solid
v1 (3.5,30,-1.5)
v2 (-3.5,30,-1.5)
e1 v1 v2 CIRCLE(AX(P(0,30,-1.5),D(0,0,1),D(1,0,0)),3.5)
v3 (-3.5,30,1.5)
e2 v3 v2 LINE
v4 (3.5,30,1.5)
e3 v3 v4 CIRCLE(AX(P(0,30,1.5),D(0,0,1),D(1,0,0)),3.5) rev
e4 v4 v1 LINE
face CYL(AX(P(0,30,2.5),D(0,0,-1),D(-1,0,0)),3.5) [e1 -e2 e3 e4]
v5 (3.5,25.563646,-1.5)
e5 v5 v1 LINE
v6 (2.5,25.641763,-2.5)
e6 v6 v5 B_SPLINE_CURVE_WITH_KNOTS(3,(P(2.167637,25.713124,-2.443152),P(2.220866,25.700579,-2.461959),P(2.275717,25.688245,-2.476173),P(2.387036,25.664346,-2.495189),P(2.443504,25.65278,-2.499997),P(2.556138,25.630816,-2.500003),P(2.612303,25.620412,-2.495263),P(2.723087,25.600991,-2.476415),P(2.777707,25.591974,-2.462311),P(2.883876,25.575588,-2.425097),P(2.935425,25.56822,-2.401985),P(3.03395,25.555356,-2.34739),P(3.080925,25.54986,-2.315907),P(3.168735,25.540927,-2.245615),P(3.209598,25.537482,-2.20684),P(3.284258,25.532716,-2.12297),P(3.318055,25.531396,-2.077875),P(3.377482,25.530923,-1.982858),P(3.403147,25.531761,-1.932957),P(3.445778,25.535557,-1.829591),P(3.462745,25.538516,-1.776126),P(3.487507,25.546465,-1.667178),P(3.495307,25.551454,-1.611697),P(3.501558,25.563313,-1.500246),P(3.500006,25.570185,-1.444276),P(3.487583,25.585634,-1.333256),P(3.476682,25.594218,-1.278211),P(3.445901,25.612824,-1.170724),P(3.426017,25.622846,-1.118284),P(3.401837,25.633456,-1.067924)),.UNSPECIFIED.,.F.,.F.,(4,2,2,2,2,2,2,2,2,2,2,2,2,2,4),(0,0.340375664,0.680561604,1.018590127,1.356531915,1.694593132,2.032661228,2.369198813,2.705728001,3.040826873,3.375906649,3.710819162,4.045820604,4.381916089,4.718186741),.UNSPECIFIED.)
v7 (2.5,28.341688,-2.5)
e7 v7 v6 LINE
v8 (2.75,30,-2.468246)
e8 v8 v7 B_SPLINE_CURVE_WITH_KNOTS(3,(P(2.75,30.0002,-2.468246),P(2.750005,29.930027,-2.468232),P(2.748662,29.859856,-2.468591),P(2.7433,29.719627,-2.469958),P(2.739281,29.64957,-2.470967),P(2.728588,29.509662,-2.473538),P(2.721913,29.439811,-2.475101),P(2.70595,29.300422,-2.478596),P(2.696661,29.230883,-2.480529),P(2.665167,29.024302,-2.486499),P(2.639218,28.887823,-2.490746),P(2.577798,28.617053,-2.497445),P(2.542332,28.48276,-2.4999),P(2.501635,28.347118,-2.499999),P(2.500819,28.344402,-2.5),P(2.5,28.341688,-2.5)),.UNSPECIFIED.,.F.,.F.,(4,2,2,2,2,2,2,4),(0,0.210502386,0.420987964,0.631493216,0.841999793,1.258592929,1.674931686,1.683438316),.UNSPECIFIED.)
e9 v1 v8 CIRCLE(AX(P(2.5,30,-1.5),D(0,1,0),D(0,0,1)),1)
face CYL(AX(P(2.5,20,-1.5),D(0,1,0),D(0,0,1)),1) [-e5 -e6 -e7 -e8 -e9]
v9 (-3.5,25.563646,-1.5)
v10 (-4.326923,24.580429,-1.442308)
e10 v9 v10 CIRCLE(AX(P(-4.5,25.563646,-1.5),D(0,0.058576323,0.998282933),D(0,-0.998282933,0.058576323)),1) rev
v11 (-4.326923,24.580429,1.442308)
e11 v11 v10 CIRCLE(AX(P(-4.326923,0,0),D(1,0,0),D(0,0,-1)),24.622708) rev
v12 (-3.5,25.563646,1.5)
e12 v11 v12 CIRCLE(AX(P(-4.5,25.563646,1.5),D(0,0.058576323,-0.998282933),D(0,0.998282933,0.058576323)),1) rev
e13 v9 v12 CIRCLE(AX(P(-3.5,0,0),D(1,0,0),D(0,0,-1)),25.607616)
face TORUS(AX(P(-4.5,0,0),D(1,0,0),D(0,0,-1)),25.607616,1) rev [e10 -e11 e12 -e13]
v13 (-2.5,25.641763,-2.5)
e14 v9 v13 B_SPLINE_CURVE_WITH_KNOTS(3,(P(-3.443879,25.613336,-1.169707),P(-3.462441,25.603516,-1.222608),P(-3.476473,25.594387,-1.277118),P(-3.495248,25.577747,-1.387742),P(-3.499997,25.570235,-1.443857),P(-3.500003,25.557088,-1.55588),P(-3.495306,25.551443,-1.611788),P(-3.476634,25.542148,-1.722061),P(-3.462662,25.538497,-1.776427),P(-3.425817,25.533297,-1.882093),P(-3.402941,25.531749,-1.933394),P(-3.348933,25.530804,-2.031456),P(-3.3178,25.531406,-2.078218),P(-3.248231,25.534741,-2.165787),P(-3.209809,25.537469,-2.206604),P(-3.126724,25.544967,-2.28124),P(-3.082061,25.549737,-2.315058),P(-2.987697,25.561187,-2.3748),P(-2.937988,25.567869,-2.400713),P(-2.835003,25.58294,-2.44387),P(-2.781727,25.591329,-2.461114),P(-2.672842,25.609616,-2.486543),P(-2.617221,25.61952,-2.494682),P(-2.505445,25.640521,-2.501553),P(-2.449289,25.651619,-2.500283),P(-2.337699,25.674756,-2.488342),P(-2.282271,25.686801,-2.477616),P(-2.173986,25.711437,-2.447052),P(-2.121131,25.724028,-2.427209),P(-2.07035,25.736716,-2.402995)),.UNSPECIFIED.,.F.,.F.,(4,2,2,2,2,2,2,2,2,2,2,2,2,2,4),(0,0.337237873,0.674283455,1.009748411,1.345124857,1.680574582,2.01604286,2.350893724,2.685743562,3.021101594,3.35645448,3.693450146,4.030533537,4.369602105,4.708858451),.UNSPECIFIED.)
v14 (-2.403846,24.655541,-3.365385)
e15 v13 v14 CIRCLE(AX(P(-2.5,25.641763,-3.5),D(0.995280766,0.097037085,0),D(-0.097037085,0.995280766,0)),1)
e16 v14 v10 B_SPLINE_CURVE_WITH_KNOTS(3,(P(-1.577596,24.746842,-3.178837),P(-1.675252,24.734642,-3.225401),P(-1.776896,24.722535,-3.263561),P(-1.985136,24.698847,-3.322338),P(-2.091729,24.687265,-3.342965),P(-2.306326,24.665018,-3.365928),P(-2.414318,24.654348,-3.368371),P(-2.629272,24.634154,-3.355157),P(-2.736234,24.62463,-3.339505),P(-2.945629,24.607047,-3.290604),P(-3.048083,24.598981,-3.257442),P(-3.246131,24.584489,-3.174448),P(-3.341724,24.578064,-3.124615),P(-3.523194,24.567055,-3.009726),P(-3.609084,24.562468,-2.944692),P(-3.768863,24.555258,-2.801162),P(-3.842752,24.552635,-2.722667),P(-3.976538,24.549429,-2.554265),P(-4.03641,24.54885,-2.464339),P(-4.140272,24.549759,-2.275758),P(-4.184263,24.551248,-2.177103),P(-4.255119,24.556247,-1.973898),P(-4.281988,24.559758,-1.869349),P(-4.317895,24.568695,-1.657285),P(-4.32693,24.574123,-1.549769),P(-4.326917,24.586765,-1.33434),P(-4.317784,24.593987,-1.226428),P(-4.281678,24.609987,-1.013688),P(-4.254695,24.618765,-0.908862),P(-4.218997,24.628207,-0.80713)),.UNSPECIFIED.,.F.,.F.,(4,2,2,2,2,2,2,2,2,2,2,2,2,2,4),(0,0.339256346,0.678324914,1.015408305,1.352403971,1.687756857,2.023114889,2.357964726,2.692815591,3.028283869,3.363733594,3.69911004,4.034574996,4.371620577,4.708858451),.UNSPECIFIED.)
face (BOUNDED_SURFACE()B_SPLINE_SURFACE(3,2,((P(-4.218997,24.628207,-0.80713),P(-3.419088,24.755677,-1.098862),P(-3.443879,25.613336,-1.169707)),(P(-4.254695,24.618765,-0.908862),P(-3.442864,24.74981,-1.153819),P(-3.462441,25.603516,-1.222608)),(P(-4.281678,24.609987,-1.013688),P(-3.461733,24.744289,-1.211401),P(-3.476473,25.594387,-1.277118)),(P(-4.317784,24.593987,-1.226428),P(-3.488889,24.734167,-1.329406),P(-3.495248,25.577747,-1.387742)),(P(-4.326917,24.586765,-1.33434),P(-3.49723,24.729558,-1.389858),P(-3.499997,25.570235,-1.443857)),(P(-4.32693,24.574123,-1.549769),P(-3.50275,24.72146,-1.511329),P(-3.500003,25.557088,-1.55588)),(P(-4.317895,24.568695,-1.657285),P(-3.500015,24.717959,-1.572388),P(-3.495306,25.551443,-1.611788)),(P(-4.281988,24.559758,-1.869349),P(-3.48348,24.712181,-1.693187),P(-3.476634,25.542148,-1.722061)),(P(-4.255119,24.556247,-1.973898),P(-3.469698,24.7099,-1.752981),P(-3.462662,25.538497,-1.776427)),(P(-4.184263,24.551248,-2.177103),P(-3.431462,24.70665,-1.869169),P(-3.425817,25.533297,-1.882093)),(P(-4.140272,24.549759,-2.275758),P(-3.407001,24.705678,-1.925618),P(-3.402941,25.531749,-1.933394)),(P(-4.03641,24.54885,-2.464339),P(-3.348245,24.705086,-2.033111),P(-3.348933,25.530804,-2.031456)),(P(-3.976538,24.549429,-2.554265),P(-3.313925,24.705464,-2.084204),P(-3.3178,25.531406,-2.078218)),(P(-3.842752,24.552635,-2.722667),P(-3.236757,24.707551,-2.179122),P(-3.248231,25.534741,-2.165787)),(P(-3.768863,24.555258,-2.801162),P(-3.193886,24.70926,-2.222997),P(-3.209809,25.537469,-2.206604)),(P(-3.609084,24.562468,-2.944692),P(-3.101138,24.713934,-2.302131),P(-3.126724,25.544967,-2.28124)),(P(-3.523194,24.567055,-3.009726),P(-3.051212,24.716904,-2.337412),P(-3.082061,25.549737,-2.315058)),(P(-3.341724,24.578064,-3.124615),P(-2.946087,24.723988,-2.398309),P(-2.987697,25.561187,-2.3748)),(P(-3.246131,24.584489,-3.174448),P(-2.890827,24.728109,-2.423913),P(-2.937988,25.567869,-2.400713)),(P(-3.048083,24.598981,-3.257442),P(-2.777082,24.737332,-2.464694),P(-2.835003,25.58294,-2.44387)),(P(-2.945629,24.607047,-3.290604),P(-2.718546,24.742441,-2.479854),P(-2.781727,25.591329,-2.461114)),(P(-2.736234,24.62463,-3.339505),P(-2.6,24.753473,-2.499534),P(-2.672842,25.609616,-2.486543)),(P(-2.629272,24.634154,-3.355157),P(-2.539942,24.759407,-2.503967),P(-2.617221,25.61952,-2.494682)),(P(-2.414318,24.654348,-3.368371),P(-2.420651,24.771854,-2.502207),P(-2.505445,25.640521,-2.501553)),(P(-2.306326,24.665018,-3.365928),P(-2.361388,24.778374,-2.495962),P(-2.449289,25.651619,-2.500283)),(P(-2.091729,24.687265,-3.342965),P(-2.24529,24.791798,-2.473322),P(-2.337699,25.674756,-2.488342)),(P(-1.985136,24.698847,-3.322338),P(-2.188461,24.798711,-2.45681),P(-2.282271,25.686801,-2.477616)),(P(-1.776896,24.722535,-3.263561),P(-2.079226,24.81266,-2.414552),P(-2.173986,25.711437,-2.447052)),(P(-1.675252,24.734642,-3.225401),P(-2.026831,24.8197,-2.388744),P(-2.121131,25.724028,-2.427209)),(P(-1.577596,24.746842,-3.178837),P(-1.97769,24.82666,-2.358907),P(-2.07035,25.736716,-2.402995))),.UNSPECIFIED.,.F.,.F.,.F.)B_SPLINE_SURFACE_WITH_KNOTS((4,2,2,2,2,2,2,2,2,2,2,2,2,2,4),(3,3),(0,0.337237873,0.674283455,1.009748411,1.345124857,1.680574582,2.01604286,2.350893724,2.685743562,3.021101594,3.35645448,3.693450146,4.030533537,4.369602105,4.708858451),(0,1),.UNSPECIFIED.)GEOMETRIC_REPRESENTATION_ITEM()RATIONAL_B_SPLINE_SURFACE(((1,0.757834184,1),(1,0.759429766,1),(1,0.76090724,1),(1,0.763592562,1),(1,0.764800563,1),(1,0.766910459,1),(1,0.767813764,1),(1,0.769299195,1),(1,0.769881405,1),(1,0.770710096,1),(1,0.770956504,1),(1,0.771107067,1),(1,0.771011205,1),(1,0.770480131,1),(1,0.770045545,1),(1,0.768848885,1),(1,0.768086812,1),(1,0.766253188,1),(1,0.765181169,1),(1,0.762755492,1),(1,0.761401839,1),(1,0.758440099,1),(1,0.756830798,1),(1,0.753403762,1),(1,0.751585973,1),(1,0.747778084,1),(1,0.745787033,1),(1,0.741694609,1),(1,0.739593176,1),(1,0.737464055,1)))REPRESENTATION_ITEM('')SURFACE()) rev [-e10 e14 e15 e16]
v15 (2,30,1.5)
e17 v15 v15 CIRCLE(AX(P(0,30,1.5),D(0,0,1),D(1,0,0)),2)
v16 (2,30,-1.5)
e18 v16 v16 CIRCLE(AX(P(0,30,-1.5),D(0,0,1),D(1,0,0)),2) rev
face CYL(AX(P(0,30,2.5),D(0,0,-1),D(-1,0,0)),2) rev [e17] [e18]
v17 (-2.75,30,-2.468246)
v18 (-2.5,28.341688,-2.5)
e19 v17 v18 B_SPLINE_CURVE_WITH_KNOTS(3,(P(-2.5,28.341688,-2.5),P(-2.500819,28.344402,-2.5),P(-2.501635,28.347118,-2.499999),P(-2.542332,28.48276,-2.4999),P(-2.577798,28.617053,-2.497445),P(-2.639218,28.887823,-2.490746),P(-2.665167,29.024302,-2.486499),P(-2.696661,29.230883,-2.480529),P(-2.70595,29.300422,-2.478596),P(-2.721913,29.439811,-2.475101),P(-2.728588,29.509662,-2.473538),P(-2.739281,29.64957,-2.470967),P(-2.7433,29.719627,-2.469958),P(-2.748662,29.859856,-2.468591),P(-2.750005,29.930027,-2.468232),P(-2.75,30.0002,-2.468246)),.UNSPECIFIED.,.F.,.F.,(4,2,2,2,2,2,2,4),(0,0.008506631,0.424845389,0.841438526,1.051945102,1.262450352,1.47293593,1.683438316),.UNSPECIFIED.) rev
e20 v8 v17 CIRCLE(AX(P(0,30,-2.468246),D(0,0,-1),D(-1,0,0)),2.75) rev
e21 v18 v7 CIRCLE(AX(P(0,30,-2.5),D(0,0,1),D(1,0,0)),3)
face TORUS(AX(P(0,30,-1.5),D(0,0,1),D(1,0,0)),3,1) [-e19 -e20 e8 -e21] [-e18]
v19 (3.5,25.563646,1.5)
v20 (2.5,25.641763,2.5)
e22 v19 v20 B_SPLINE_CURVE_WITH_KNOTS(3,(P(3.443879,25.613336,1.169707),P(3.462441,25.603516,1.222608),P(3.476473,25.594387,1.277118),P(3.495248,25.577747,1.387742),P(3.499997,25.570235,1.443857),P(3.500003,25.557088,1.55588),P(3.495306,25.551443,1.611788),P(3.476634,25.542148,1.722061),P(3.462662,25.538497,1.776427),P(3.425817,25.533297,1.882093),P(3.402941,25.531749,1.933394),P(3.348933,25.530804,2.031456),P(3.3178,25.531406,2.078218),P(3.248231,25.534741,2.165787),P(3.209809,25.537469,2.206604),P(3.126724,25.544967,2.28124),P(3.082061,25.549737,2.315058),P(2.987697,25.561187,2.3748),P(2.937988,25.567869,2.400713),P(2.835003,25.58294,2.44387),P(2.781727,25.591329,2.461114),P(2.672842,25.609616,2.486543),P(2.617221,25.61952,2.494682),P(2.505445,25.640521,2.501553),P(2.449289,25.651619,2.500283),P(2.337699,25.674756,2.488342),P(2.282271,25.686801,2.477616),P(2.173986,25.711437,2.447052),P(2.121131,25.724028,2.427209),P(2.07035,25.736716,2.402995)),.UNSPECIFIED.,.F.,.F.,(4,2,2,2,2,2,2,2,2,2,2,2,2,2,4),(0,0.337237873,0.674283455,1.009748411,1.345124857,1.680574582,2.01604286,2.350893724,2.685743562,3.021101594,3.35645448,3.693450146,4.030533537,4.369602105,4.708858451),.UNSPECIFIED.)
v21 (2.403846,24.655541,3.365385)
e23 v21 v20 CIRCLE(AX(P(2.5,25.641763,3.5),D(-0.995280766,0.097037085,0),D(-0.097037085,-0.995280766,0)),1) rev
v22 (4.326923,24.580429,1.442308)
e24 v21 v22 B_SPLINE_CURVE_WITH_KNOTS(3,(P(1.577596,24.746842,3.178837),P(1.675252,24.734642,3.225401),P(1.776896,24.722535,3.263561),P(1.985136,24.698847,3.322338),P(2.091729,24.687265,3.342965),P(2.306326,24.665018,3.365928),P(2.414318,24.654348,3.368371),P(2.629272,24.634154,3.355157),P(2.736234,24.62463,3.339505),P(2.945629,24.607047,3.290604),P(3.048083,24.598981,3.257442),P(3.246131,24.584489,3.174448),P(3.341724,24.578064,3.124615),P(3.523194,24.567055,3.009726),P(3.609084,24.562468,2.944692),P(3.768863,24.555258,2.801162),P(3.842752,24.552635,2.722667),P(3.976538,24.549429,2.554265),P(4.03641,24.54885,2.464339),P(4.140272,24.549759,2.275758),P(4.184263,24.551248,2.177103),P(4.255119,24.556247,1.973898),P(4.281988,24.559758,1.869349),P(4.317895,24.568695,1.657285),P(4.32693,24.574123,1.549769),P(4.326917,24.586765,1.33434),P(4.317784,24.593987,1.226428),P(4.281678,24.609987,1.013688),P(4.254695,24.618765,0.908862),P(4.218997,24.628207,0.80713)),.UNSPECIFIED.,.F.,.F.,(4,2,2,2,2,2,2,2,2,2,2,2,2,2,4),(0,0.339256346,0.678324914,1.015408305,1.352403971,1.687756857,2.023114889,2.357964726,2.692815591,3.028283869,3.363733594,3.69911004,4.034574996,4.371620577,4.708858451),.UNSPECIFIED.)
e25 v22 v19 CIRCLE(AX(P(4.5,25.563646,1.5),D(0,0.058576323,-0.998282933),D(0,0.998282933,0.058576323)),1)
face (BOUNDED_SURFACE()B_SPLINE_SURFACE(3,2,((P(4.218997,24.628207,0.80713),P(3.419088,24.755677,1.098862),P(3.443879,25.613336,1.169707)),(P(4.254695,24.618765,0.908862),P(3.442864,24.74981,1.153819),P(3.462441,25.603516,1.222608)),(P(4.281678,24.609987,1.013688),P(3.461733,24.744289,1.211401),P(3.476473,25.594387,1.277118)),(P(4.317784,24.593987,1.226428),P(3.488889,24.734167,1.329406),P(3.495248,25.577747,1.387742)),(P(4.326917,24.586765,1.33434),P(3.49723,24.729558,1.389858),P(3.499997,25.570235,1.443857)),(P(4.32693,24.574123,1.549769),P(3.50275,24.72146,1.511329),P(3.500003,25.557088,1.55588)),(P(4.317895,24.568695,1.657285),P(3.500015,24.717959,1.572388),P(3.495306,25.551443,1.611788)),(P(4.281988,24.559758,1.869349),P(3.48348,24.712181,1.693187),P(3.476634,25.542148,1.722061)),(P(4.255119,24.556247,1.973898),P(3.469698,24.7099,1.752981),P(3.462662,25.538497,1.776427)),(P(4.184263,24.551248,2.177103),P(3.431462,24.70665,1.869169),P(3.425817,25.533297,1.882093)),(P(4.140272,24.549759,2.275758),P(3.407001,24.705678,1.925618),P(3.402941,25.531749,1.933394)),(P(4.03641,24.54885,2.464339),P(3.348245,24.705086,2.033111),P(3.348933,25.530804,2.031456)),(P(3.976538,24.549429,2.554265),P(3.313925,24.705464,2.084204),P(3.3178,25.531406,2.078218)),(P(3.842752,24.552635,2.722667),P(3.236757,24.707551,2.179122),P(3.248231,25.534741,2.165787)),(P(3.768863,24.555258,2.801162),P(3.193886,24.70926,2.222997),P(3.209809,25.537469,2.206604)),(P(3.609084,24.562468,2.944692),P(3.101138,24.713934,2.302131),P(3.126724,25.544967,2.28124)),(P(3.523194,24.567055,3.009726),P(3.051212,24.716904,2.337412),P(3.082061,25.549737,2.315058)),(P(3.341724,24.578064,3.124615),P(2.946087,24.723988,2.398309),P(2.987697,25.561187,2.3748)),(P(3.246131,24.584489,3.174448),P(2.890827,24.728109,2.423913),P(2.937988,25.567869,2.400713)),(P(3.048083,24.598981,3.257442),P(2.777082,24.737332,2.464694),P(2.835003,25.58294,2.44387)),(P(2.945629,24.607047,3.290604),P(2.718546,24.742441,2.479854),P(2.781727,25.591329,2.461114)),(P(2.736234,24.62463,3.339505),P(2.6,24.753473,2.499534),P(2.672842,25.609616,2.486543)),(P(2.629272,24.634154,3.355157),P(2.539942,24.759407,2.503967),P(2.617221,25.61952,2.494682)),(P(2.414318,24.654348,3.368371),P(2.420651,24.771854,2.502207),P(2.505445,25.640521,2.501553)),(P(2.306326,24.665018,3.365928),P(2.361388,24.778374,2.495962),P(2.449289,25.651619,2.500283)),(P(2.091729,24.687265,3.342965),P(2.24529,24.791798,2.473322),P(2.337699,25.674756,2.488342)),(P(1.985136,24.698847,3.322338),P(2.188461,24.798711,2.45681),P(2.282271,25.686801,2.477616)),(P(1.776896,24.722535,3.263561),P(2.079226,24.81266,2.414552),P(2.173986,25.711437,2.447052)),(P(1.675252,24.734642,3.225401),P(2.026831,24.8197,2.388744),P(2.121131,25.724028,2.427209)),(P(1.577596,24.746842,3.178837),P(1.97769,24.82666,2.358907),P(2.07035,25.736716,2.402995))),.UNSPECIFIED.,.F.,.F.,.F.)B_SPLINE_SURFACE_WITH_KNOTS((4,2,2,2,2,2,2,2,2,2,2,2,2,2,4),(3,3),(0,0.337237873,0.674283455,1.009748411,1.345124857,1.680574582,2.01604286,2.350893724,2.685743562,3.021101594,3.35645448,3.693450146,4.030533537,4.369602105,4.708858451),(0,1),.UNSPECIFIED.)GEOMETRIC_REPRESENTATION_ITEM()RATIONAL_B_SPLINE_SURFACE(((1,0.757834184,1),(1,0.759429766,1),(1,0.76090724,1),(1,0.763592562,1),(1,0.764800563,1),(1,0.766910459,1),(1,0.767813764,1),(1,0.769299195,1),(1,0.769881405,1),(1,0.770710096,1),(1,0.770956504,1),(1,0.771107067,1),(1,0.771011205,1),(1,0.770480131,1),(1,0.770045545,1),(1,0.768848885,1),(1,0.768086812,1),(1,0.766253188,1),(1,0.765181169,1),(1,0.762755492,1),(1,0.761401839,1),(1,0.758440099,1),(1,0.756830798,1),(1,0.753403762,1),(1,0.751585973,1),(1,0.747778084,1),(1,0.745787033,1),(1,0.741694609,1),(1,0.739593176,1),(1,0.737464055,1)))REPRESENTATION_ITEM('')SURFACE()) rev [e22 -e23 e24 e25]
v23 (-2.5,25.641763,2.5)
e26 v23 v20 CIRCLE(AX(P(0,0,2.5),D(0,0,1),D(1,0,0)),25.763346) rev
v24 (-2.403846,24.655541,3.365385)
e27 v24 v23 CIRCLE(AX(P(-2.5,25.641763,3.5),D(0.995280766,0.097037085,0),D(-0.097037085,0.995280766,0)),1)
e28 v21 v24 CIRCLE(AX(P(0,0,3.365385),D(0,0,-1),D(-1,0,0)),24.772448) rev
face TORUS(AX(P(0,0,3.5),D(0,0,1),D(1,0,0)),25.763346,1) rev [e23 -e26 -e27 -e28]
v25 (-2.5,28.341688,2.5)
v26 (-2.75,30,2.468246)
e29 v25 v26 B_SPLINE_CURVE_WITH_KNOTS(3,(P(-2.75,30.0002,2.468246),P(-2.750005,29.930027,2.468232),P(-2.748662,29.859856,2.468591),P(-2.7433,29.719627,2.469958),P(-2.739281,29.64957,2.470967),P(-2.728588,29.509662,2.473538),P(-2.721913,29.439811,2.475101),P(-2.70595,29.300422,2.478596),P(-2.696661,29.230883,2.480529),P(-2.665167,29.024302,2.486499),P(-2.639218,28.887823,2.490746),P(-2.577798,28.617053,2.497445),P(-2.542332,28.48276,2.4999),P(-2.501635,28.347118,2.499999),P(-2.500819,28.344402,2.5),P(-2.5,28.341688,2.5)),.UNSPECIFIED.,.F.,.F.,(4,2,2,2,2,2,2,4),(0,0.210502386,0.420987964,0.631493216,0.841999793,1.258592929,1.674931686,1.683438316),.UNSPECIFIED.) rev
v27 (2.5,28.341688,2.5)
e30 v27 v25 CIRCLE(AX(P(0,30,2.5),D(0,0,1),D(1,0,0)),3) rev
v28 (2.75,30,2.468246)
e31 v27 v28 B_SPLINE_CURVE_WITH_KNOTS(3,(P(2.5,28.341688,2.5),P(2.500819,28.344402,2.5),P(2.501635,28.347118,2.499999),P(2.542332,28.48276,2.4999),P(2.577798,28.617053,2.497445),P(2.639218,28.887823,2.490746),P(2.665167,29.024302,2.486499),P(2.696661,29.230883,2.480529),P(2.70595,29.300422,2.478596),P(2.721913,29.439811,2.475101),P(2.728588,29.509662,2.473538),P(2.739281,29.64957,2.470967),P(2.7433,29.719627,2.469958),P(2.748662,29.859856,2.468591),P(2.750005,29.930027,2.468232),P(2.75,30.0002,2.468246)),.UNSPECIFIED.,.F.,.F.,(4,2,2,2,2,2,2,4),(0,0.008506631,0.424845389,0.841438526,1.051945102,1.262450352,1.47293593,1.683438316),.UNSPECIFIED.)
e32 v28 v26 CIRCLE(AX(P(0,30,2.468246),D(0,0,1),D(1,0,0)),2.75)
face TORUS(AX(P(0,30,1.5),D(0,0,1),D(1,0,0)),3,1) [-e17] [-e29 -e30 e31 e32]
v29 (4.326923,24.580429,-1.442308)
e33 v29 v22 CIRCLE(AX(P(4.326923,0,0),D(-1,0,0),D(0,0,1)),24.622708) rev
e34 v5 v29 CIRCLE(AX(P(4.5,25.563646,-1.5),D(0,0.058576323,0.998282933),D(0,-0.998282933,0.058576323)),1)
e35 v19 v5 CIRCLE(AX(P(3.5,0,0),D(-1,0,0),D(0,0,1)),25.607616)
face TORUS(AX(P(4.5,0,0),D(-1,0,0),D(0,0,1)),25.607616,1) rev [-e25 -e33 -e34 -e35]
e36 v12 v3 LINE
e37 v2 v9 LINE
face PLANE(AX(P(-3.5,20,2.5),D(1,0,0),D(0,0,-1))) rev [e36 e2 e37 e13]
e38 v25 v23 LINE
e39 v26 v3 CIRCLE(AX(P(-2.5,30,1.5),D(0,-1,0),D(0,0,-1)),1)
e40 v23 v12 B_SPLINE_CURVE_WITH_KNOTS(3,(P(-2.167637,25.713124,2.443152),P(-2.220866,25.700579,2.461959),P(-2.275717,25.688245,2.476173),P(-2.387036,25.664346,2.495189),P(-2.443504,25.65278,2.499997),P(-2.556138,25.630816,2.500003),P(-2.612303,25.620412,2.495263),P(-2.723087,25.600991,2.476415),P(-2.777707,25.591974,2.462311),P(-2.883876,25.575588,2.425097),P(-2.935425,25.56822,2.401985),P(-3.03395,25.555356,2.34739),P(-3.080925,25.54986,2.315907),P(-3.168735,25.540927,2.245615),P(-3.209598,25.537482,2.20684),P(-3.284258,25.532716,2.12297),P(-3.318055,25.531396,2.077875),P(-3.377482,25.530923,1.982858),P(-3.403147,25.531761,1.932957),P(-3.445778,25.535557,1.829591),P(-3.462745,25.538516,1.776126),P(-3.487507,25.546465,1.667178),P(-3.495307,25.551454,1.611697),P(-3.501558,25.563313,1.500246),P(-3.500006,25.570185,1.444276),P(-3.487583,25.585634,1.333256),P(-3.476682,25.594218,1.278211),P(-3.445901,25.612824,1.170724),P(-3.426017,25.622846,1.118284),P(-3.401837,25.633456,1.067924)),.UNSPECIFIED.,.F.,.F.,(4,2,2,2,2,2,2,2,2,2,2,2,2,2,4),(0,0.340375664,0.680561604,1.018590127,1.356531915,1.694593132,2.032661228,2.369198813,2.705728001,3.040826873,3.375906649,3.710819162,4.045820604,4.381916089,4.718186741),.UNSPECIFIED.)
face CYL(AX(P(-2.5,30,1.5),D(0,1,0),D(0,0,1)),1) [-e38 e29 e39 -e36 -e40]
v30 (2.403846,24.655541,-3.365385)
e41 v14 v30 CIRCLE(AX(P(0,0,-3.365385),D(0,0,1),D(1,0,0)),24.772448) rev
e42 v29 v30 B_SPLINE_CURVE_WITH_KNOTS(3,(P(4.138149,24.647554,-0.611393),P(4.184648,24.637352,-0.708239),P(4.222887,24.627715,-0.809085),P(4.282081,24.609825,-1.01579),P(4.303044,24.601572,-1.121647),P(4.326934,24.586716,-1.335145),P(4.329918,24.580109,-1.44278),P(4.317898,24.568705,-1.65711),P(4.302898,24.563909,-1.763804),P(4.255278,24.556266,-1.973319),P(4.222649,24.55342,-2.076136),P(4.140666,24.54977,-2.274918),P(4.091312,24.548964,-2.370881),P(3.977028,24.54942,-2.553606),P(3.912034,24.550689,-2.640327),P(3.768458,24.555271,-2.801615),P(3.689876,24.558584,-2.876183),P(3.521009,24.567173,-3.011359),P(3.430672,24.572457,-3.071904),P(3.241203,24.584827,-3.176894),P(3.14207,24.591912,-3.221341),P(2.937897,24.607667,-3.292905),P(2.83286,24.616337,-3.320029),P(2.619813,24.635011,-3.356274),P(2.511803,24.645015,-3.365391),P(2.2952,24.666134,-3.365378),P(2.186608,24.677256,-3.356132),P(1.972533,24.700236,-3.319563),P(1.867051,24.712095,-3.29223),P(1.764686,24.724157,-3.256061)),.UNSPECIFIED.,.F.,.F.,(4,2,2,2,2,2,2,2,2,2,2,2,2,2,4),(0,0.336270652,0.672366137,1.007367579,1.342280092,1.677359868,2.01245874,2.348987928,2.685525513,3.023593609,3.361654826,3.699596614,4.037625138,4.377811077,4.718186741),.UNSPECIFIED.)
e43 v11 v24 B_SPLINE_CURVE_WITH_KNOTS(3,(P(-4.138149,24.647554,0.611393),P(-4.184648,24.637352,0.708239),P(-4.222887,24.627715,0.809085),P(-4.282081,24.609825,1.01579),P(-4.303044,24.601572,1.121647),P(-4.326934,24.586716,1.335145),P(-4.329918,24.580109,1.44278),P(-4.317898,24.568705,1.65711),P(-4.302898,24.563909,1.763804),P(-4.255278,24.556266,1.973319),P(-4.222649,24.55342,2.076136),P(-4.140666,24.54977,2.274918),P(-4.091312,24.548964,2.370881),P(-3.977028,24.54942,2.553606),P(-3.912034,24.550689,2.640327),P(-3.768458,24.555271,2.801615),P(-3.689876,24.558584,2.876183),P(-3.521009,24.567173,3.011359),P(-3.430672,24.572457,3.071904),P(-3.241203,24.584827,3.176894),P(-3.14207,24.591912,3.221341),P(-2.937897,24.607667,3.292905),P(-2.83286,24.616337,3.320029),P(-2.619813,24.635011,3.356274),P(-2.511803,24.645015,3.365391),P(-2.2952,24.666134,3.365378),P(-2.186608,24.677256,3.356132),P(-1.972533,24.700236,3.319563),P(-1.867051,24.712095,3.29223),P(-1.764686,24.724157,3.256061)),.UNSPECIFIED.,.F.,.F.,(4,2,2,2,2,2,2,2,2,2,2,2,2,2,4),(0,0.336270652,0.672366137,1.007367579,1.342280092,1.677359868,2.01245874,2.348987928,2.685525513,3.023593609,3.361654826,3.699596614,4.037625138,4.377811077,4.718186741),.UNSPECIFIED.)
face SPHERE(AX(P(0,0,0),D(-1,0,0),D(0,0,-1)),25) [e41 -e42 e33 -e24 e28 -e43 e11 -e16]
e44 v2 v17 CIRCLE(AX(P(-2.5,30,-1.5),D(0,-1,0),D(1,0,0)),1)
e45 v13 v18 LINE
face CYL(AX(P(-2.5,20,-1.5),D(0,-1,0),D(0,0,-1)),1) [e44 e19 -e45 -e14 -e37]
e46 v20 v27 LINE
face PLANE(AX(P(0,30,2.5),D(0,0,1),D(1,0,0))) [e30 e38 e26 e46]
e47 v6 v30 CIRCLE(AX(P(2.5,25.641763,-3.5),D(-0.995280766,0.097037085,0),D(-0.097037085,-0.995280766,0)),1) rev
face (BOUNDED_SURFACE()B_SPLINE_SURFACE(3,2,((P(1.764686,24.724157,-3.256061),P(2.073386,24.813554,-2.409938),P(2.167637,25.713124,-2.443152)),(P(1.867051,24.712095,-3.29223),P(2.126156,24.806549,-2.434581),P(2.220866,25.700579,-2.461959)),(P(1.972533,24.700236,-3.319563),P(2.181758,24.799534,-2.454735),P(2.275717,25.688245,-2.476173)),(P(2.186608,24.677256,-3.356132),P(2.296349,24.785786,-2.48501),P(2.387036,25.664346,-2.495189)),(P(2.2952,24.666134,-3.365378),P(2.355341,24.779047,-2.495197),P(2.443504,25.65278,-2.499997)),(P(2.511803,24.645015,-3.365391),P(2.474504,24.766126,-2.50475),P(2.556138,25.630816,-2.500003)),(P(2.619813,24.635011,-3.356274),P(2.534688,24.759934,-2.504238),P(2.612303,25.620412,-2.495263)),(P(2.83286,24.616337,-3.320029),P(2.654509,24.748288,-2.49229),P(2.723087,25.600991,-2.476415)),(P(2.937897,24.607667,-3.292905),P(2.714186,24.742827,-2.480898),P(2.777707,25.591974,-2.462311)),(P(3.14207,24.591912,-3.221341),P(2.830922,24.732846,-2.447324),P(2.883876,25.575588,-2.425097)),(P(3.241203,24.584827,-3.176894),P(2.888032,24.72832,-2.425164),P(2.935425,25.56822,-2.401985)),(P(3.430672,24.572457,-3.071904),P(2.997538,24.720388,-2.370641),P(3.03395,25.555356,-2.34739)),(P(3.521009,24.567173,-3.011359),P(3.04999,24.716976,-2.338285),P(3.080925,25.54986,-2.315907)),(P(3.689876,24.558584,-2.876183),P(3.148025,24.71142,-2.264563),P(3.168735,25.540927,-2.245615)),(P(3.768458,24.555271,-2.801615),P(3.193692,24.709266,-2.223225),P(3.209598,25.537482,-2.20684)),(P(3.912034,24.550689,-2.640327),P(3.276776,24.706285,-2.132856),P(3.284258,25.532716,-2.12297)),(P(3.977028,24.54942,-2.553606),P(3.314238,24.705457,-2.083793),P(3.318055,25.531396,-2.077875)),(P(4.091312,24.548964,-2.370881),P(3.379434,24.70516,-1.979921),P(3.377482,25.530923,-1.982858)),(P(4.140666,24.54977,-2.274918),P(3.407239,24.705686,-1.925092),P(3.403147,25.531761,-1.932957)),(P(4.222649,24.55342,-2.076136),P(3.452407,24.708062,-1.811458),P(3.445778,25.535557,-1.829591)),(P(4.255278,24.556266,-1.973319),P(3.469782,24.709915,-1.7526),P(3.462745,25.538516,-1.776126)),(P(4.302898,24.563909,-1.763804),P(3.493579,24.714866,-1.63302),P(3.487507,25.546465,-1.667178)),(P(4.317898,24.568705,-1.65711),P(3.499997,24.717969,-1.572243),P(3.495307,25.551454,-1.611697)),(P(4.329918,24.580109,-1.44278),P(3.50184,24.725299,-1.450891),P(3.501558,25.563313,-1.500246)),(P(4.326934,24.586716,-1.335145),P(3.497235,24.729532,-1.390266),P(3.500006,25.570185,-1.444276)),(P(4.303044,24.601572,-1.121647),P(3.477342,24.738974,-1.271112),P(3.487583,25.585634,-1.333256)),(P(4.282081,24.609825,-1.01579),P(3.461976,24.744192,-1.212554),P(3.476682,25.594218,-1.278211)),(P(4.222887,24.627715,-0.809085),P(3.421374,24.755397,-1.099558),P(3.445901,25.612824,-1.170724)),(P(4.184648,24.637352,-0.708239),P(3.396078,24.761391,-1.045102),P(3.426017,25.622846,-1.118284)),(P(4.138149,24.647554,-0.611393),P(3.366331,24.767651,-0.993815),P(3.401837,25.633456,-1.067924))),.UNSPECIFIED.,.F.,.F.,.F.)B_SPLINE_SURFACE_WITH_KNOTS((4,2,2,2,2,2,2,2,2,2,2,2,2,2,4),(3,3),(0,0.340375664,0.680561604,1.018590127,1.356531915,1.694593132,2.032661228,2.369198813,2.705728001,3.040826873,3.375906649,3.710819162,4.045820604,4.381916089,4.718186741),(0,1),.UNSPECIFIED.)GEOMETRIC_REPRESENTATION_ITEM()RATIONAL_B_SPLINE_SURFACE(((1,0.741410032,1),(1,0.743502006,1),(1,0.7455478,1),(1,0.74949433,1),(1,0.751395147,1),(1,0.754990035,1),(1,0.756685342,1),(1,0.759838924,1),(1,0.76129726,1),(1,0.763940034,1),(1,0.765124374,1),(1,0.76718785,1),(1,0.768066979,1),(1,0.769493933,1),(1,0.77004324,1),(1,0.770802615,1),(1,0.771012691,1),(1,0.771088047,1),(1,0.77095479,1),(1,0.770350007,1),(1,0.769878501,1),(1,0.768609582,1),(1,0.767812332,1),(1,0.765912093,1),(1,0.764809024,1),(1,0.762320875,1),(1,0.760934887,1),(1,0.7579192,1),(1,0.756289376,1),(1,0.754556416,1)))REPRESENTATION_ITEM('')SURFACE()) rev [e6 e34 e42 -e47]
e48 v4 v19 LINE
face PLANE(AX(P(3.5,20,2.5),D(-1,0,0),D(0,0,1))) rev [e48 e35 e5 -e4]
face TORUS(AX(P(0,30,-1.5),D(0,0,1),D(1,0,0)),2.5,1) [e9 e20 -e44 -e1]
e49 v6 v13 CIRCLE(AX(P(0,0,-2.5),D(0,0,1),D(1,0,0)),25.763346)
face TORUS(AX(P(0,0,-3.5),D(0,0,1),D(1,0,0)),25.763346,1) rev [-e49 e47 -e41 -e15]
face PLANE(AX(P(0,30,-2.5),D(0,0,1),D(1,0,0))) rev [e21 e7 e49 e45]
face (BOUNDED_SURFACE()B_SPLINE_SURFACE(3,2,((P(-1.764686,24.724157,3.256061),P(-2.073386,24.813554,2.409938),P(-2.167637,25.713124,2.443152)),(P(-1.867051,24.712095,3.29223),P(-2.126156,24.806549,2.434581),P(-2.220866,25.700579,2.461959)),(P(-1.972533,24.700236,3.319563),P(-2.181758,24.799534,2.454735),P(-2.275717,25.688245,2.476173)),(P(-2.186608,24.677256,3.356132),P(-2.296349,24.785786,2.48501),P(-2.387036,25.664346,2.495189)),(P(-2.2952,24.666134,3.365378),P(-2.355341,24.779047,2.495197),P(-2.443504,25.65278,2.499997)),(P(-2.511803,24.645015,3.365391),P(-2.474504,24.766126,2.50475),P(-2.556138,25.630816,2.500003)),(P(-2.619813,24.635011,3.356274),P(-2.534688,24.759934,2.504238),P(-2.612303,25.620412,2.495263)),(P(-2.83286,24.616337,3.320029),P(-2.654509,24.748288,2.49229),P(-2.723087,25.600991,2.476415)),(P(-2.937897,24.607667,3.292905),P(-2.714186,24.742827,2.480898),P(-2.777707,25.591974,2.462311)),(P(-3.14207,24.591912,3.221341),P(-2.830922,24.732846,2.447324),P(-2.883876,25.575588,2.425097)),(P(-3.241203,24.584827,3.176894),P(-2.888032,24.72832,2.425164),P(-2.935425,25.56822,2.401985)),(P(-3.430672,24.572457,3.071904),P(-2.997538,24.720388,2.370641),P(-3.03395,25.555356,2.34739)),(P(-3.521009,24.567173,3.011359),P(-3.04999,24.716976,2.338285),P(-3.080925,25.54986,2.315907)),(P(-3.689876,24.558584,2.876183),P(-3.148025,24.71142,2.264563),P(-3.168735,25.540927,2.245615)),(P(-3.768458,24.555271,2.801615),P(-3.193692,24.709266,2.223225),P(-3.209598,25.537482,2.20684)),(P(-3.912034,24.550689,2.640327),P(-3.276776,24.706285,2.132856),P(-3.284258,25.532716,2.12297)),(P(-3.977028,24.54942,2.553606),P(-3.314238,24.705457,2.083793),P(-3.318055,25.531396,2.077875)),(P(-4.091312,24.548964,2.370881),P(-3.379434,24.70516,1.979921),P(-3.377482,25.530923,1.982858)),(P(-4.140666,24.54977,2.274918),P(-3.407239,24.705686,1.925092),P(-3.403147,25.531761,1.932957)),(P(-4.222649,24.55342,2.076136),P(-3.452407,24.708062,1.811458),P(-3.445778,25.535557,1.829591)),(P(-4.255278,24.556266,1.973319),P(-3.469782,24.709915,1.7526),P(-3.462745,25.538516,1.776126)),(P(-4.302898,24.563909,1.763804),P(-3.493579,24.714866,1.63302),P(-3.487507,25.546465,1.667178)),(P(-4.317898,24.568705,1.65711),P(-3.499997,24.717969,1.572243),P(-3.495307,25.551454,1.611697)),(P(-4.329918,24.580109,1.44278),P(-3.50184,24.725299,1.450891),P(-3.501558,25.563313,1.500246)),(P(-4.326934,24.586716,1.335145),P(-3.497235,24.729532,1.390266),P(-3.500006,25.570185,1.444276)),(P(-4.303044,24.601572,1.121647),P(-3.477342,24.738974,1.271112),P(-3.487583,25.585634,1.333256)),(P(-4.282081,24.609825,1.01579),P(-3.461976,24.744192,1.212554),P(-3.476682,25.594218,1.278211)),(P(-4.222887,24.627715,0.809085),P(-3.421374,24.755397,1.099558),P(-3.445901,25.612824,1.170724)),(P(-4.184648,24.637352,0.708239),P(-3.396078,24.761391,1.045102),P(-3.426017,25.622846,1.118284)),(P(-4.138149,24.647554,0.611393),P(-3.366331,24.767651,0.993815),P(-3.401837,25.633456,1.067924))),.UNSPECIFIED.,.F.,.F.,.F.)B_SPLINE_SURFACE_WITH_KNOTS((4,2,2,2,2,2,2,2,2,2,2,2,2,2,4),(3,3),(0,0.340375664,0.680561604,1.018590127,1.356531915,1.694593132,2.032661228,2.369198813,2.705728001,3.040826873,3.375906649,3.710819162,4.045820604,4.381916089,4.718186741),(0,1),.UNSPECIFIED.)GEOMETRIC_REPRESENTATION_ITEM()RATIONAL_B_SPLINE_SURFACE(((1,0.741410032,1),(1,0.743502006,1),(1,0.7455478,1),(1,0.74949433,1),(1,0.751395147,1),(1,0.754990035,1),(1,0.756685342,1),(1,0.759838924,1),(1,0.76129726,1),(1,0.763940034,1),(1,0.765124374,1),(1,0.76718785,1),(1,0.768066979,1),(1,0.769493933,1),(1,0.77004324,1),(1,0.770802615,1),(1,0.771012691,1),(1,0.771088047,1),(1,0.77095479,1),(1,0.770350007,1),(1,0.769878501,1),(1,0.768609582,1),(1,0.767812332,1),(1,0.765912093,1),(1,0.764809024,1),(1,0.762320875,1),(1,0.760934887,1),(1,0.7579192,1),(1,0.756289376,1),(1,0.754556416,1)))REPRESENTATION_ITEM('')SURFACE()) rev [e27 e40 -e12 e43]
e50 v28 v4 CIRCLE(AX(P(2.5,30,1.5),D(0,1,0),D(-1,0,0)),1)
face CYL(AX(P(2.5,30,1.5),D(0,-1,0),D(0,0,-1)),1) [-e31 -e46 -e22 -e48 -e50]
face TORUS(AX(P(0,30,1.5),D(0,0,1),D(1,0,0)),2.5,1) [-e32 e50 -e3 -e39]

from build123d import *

# Parameters (mm, degrees)
SKETCH2_R           = 2
BOSS_EXTRUDE1_DEPTH = 2.5
FILLET1_R           = 1


with BuildPart() as part:
    # Sketch1 → Revolve1 (revolve)
    with BuildSketch(Plane(origin=(0, 0, 0), x_dir=(1, 0, 0), z_dir=(0, 1, 0))):
        with BuildLine():
            Line((-25, 0), (25, 0))
            ThreePointArc((25, 0), (0, 25), (-25, 0))
        make_face()
    revolve(axis=Axis((-25, 0, 0), (1, 0, 0)))

    # Sketch2 → Boss-Extrude1 (add, symmetric)
    with BuildSketch(Plane.XY):
        with BuildLine():
            Line((-3.5, 20), (3.5, 20))
            Line((3.5, 20), (3.5, 30))
            ThreePointArc((3.5, 30), (0, 33.5), (-3.5, 30))
            Line((-3.5, 30), (-3.5, 20))
        make_face()
        with Locations((0, 30)):
            Circle(SKETCH2_R, mode=Mode.SUBTRACT)
    extrude(amount=BOSS_EXTRUDE1_DEPTH, both=True)

    # Fillet1
    fillet1_edges = [part.edges().sort_by_distance(p)[0] for p in [
        (-3.5, 27.313610356, 2.5),
        (3.5, 27.313610356, 2.5),
        (0, 33.5, 2.5),
    ]]
    fillet(fillet1_edges, radius=FILLET1_R)
    fillet1_2_edges = [part.edges().sort_by_distance(p)[0] for p in [
        (-3.5, 27.313610356, -2.5),
        (0, 33.5, -2.5),
        (3.5, 27.313610356, -2.5),
    ]]
    fillet(fillet1_2_edges, radius=FILLET1_R)
    fillet1_3_edges = [part.edges().sort_by_distance(p)[0] for p in [
        (0, 24.874685928, -2.5),
    ]]
    fillet(fillet1_3_edges, radius=FILLET1_R)
    # the kernel refuses this fillet: 1 mm, written as the material it takes off along each edge
    with BuildSketch(Plane(origin=(0, 30, -2.5), x_dir=(1, 0, 0), z_dir=(0, -1, 0))) as fillet1_4_piece_1:
        with BuildLine():
            CenterArc((2 + FILLET1_R, FILLET1_R), FILLET1_R, 180, 90)
            Line((2, FILLET1_R), (2 - FILLET1_R * 0.02, FILLET1_R))
            Line((2 - FILLET1_R * 0.02, FILLET1_R), (2 - FILLET1_R * 0.02, -FILLET1_R * 0.02))
            Line((2 - FILLET1_R * 0.02, -FILLET1_R * 0.02), (2 + FILLET1_R, -FILLET1_R * 0.02))
            Line((2 + FILLET1_R, -FILLET1_R * 0.02), (2 + FILLET1_R, 0))
        make_face()
    revolve(axis=Axis((0, 30, -2.5), (0, 0, 1)), mode=Mode.SUBTRACT)
    # the kernel refuses this fillet: 1 mm, written as the material it takes off along each edge
    with BuildSketch(Plane(origin=(0, 30, 2.5), x_dir=(1, 0, 0), z_dir=(0, -1, 0))) as fillet1_5_piece_1:
        with BuildLine():
            CenterArc((2 + FILLET1_R, -FILLET1_R), FILLET1_R, 90, 90)
            Line((2, -FILLET1_R), (2 - FILLET1_R * 0.02, -FILLET1_R))
            Line((2 - FILLET1_R * 0.02, -FILLET1_R), (2 - FILLET1_R * 0.02, FILLET1_R * 0.02))
            Line((2 - FILLET1_R * 0.02, FILLET1_R * 0.02), (2 + FILLET1_R, FILLET1_R * 0.02))
            Line((2 + FILLET1_R, FILLET1_R * 0.02), (2 + FILLET1_R, 0))
        make_face()
    revolve(axis=Axis((0, 30, 2.5), (0, 0, 1)), mode=Mode.SUBTRACT)


solid = part.part
